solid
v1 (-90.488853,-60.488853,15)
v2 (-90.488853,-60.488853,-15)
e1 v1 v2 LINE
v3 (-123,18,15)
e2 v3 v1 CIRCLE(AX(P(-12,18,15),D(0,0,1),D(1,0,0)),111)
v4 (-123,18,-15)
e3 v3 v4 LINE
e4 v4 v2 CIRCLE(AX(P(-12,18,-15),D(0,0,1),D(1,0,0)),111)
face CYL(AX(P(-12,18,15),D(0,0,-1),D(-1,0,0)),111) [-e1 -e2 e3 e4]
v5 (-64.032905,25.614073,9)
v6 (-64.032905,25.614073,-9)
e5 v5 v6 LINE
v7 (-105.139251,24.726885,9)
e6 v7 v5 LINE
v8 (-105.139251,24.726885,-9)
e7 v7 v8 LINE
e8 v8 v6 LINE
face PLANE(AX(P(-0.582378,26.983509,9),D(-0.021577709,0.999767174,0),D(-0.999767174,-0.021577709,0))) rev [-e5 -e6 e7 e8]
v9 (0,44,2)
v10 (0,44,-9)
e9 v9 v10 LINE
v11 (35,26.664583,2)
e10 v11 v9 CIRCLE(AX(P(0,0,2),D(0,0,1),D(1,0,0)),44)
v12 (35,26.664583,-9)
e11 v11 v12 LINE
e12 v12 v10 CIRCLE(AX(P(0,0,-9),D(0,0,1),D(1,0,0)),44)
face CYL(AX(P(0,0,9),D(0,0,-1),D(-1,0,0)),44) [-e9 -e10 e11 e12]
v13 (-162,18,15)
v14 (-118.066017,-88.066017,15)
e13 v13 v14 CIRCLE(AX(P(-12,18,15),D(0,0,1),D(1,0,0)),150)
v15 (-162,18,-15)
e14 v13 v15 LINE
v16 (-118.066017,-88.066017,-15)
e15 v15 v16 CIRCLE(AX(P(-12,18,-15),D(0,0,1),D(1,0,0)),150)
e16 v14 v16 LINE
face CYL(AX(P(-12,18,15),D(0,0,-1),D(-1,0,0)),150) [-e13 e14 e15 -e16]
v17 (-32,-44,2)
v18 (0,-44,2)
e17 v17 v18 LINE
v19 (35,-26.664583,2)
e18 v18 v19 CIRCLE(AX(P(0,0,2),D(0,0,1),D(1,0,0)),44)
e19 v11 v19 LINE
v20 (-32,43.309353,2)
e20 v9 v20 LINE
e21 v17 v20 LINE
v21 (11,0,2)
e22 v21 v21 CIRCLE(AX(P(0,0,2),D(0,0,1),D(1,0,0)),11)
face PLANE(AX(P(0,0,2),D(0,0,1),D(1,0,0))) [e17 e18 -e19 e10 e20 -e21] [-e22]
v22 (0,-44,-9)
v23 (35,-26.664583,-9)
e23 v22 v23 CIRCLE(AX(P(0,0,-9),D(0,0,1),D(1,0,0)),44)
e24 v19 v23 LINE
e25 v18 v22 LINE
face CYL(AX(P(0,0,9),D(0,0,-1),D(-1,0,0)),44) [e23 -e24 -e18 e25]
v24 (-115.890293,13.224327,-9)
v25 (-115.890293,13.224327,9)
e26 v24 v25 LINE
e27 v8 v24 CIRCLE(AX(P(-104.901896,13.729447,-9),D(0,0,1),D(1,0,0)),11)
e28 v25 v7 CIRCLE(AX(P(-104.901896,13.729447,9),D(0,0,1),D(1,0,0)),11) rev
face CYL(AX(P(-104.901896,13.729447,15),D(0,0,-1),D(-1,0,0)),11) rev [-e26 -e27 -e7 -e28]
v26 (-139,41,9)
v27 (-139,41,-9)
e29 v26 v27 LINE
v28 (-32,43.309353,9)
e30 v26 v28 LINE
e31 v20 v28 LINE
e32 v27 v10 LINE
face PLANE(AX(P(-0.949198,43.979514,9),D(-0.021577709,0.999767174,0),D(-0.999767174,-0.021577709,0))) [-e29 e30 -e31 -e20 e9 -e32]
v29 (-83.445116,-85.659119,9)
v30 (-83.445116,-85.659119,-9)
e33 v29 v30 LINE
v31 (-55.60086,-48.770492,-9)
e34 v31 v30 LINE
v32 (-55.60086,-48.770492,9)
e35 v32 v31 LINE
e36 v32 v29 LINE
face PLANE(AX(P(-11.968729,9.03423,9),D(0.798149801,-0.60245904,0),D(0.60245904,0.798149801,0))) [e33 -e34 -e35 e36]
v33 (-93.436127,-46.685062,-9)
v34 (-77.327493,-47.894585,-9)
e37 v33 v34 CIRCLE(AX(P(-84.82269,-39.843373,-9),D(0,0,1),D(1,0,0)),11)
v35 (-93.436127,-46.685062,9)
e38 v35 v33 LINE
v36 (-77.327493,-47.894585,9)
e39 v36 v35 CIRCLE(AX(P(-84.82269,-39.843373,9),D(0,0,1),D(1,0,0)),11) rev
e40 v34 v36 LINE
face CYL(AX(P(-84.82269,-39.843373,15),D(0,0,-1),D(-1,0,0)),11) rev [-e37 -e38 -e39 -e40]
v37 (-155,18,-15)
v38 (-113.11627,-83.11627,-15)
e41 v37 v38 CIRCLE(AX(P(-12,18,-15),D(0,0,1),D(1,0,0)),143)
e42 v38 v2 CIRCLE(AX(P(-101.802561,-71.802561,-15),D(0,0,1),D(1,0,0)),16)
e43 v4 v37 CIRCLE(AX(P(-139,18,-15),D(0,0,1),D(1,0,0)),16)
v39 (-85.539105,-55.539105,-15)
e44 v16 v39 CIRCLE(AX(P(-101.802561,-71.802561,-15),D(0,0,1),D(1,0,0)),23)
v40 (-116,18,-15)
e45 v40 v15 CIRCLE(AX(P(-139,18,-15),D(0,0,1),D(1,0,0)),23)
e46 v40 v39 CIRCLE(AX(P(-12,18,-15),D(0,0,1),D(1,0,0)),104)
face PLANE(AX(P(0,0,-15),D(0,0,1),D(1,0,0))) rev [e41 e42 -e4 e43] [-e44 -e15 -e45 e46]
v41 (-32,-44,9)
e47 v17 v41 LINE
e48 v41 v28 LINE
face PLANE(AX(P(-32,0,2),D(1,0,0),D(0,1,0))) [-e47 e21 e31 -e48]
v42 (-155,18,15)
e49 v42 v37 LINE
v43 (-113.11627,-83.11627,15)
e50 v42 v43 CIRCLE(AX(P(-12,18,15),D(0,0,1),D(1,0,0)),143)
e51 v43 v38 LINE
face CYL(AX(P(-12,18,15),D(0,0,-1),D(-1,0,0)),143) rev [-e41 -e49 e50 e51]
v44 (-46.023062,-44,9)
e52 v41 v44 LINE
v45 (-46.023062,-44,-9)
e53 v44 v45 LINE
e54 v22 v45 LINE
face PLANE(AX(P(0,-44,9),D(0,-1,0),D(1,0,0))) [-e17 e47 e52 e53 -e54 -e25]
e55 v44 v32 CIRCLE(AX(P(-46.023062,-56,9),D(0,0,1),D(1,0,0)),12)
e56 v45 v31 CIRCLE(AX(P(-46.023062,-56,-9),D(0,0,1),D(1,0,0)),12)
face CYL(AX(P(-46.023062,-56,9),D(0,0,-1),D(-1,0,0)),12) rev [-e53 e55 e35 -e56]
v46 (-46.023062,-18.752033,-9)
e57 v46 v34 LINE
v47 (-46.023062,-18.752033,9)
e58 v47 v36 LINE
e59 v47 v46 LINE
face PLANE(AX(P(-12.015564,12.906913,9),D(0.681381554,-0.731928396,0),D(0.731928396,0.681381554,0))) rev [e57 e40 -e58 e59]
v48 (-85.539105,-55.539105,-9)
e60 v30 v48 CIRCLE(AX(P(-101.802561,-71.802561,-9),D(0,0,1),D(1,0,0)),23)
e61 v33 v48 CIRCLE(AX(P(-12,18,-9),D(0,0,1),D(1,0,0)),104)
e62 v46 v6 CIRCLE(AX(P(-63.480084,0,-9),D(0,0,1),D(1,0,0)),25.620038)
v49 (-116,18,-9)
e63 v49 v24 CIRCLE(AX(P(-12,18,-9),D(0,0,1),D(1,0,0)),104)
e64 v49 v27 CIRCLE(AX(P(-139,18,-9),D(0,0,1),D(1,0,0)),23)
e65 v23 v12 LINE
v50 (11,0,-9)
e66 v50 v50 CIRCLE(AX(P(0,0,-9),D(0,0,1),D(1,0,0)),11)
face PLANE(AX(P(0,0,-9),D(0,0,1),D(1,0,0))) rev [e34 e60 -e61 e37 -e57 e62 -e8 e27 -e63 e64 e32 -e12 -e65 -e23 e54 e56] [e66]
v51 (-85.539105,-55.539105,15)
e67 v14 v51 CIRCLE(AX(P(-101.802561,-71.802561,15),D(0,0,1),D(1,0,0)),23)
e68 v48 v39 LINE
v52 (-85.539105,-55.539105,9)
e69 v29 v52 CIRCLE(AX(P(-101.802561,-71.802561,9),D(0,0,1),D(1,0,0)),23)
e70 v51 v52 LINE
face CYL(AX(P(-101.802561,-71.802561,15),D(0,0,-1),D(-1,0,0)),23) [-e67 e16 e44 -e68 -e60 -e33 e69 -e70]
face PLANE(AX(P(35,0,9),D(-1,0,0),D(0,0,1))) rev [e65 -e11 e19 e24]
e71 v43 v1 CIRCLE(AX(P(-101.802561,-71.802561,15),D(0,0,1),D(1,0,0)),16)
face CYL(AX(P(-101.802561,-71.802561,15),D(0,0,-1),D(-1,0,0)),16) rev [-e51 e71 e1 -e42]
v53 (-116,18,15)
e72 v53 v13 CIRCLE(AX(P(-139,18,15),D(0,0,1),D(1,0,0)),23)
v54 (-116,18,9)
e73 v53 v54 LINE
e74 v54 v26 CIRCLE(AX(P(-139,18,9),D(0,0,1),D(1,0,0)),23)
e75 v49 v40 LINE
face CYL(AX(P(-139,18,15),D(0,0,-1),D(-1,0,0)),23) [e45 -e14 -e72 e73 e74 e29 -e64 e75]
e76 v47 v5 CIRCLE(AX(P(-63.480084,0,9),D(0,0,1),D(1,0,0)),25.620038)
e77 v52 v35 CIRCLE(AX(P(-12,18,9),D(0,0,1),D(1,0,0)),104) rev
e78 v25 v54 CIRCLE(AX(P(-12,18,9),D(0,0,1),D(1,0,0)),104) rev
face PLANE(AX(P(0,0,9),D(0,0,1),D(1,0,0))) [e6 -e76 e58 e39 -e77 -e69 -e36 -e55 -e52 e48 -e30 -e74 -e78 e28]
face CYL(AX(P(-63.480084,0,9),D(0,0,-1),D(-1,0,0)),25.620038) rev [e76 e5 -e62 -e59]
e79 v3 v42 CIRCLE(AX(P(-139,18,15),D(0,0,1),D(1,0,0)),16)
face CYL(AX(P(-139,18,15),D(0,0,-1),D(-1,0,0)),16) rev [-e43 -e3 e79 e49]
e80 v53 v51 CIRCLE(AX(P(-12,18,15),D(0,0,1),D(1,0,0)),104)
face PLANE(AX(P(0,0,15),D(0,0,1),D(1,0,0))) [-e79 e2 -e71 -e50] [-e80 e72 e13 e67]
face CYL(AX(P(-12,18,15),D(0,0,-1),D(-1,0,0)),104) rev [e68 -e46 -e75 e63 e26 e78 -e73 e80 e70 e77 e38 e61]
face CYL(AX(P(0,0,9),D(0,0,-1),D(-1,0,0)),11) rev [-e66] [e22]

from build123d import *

# Parameters (mm, degrees)
BOSS_EXTRUDE1_DEPTH = 15
SKETCH1_3_R         = 11
BOSS_EXTRUDE2_DEPTH = 9
CUT_EXTRUDE1_START  = 2
SKETCH1_5_R         = 11
CUT_EXTRUDE1_DEPTH  = 7
FILLET1_R           = 11


with BuildPart() as part:
    # Sketch1 → Boss-Extrude1 (new, symmetric)
    with BuildSketch(Plane.XY):
        with BuildLine():
            ThreePointArc((-162, 18), (-150.581929877, -39.402514855), (-118.066017178, -88.066017178))
            ThreePointArc((-118.066017178, -88.066017178), (-85.539105243, -88.066017178), (-85.539105243, -55.539105243))
            ThreePointArc((-85.539105243, -55.539105243), (-108.083471381, -21.799076966), (-116, 18))
            ThreePointArc((-116, 18), (-139, 41), (-162, 18))
        make_face()
        with BuildLine():
            ThreePointArc((-123, 18), (-139, 34), (-155, 18))
            ThreePointArc((-155, 18), (-144.114773149, -36.723730828), (-113.11626971, -83.11626971))
            ThreePointArc((-113.11626971, -83.11626971), (-90.488852712, -83.11626971), (-90.488852712, -60.488852712))
            ThreePointArc((-90.488852712, -60.488852712), (-114.550628109, -24.477860993), (-123, 18))
        make_face(mode=Mode.SUBTRACT)
    extrude(amount=BOSS_EXTRUDE1_DEPTH, both=True)

    # Sketch1<3> → Boss-Extrude2 (add, symmetric)
    with BuildSketch(Plane.XY):
        with BuildLine():
            ThreePointArc((0, -44), (19.528931575, -39.428680317), (35, -26.664583252))
            Line((35, -26.664583252), (35, 26.664583252))
            ThreePointArc((35, 26.664583252), (19.528931575, 39.428680317), (0, 44))
            Line((0, 44), (-139, 41))
            ThreePointArc((-139, 41), (-125.21351497, 36.410128476), (-116.929481683, 24.472420045))
            Line((-116.929481683, 24.472420045), (-64.032905328, 25.614072772))
            ThreePointArc((-64.032905328, 25.614072772), (-51.356216469, 22.569851157), (-41.818901123, 13.681356252))
            ThreePointArc((-41.818901123, 13.681356252), (-38.072611256, -3.293430459), (-46.023062445, -18.752033163))
            Line((-46.023062445, -18.752033163), (-85.539105243, -55.539105243))
            ThreePointArc((-85.539105243, -55.539105243), (-78.857942833, -70.207416226), (-83.445115781, -85.659119128))
            Line((-83.445115781, -85.659119128), (-55.600860061, -48.770491521))
            ThreePointArc((-55.600860061, -48.770491521), (-51.37310442, -45.258629004), (-46.023062445, -44))
            Line((-46.023062445, -44), (0, -44))
        make_face()
        Circle(SKETCH1_3_R, mode=Mode.SUBTRACT)
    extrude(amount=BOSS_EXTRUDE2_DEPTH, both=True)

    # Sketch1<5> → Cut-Extrude1 (cut)
    # profile 1 of 2: a face of its own
    with BuildSketch(Plane.XY.offset(CUT_EXTRUDE1_START)):
        with BuildLine():
            ThreePointArc((-32, 30.199337741), (-18.292282048, 40.017401433), (-1.898396275, 43.959027419))
            Line((-1.898396275, 43.959027419), (-32, 43.309352518))
            Line((-32, 43.309352518), (-32, 30.199337741))
        make_face()
    # profile 2 of 2: a face of its own
    with BuildSketch(Plane.XY.offset(CUT_EXTRUDE1_START)):
        with BuildLine():
            ThreePointArc((0, -44), (19.528931575, -39.428680317), (35, -26.664583252))
            Line((35, -26.664583252), (35, 26.664583252))
            ThreePointArc((35, 26.664583252), (19.528931575, 39.428680317), (0, 44))
            Line((0, 44), (-1.898396275, 43.959027419))
            ThreePointArc((-1.898396275, 43.959027419), (-18.292282048, 40.017401433), (-32, 30.199337741))
            Line((-32, 30.199337741), (-32, -44))
            Line((-32, -44), (0, -44))
        make_face()
        Circle(SKETCH1_5_R, mode=Mode.SUBTRACT)
    extrude(amount=CUT_EXTRUDE1_DEPTH, mode=Mode.SUBTRACT)

    # Fillet1
    # the kernel refuses this fillet: 11 mm, written as the material it adds along each edge
    with BuildSketch(Plane(origin=(-116.929481683, 24.472420045, -9), x_dir=(0.09199621830017597, -0.9957593563800776, 0), z_dir=(0, 0, 1))) as fillet1_piece_1:
        with BuildLine():
            CenterArc((11.803908742, 10.988267546), FILLET1_R, 175.957949098, 91.395536091)
            Line((0.831270302, 11.763642077), (-0.265993542, 11.841179531))
            Line((-0.265993542, 11.841179531), (-1.097263844, 0.077537453))
            Line((-1.097263844, 0.077537453), (0.211131542, -1.079547809))
            ThreePointArc((0.211131542, -1.079547809), (6.429285778, -0.765233377), (11.245203657, -1.098826755))
            Line((11.245203657, -1.098826755), (11.295995028, 0))
        make_face()
    extrude(amount=18)
    with BuildSketch(Plane(origin=(-85.539105243, -55.539105243, 9), x_dir=(-0.6656229330882777, 0.7462882224361834, 0), z_dir=(0, 0, -1))) as fillet1_piece_2:
        with BuildLine():
            CenterArc((11.236677702, 10.982091478), FILLET1_R, 178.778435739, 94.49143138)
            Line((0.239177665, 11.216597213), (0, 0))
            ThreePointArc((0, 0), (5.932053203, -0.16931694), (11.864106406, 0))
        make_face()
    extrude(amount=18)


solid = part.part
